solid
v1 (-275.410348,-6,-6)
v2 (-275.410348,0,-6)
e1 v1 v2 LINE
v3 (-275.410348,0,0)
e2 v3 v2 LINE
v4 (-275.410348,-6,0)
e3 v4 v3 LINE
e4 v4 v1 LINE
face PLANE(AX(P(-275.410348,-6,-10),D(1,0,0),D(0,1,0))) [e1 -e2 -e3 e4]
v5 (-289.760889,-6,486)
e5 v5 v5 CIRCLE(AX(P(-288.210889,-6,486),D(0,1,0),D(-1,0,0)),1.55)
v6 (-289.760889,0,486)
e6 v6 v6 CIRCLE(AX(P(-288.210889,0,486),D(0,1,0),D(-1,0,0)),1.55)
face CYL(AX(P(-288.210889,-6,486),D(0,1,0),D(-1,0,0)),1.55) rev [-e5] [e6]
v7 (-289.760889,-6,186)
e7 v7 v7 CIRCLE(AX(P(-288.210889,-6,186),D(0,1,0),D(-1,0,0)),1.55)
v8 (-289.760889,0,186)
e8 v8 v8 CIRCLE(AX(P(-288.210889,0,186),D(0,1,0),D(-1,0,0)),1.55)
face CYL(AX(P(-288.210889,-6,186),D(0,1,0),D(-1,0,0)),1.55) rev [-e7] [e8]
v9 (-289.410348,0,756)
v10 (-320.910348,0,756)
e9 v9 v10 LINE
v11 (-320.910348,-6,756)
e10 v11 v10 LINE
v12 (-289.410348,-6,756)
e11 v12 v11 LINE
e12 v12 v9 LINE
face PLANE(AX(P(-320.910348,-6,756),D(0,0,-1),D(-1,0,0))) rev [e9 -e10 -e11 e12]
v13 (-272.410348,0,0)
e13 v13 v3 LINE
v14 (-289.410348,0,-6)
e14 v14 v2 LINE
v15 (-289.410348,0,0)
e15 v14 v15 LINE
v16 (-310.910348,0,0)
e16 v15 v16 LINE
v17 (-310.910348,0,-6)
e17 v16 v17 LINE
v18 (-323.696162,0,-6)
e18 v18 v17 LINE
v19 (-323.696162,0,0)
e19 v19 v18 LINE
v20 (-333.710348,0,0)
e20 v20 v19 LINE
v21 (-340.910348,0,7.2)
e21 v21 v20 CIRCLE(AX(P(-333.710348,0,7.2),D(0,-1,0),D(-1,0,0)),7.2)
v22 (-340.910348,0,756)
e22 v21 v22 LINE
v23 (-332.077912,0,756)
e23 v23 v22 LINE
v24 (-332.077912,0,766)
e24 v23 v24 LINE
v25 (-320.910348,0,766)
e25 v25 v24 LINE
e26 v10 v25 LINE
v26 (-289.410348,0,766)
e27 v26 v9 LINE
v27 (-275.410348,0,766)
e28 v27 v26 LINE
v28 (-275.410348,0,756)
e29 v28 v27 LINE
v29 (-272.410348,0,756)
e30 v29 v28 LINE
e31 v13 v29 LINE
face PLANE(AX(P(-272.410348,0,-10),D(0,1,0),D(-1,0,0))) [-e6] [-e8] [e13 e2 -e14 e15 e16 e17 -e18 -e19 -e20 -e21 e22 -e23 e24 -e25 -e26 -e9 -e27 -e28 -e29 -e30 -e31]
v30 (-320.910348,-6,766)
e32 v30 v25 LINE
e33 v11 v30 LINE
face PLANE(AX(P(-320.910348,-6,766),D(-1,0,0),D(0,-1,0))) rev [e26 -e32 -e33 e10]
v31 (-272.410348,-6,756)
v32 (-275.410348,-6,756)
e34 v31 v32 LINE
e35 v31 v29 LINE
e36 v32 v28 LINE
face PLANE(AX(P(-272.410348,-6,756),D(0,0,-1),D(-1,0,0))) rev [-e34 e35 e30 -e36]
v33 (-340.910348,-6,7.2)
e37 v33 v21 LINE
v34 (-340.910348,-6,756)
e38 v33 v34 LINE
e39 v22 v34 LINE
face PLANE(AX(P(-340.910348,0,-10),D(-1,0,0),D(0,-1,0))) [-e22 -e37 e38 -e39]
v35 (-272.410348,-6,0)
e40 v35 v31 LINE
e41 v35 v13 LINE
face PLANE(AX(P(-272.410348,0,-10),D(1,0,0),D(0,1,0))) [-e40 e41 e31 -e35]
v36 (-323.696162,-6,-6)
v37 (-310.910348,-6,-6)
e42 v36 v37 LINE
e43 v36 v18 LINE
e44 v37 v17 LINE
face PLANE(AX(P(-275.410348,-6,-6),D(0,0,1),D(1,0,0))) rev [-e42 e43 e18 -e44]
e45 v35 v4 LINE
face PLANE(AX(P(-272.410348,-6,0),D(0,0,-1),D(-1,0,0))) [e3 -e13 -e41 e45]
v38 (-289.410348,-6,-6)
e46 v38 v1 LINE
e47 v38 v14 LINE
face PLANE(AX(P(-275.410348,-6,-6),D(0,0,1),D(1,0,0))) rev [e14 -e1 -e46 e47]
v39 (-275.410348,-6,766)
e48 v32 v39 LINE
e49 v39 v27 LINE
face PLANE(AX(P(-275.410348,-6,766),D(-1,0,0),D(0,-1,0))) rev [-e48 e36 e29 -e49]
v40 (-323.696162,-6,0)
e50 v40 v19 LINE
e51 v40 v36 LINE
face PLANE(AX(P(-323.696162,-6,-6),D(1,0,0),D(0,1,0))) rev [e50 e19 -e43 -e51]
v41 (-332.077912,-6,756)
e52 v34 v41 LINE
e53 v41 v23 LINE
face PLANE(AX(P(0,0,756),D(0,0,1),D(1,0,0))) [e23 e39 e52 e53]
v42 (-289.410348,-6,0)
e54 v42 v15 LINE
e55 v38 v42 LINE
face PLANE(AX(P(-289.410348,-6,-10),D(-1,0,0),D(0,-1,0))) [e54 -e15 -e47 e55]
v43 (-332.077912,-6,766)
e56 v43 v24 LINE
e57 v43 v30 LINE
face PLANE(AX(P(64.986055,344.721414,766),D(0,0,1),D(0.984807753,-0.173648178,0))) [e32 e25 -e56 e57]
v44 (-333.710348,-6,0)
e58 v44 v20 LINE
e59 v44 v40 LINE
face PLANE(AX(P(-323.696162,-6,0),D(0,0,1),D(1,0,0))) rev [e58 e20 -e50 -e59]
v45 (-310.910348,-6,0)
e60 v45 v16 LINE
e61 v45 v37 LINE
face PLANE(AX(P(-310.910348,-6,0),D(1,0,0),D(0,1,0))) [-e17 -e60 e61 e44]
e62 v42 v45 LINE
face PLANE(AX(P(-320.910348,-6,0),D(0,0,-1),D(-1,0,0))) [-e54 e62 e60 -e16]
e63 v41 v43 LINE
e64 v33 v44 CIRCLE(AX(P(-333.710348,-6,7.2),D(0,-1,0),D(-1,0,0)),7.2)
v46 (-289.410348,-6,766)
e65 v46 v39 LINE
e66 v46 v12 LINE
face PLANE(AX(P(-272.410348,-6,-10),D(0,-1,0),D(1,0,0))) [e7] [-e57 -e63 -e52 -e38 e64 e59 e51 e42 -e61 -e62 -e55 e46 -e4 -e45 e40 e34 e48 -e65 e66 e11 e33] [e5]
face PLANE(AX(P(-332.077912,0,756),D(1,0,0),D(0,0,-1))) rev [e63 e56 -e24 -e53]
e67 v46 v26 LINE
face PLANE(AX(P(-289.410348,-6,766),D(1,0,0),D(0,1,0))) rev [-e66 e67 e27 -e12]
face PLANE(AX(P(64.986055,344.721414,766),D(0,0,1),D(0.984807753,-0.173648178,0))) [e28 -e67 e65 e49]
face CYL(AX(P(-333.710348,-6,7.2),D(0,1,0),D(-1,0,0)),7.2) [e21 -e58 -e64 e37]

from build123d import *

# Parameters (mm, degrees)
DODANIE_WYCI_GNI_CIE1_DEPTH      = 766
DODANIE_WYCI_GNI_CIE1_DEPTH_BACK = 10
OBIEKT_PRZENIE_KOPIUJ1_ANGLE     = 10
SZKIC2_W                         = 31.5
SZKIC2_H                         = 10
SZKIC2_W_2                       = 8
SZKIC2_H_2                       = 4
SZKIC2_W_3                       = 3
WYTNIJ_WYCI_GNI_CIE1_DEPTH       = 6
SZKIC3_R                         = 1.55
WYTNIJ_WYCI_GNI_CIE2_DEPTH       = 6
SZYK_LINIOWY1_COUNT              = 2
SZYK_LINIOWY1_PITCH              = 300
WYTNIJ_WYCI_GNI_CIE3_DEPTH       = 6
SZKIC5_W                         = 12
SZKIC5_H                         = 6
DODANIE_WYCI_GNI_CIE2_DEPTH      = 6
SZKIC14_W                        = 8.832436052
SZKIC14_H                        = 6
WYTNIJ_WYCI_GNI_CIE6_DEPTH       = 10


with BuildPart() as part:
    # Szkic1 → Dodanie-wyciągnięcie1 (new, two sides: drawn at the far end of the back side and taken through both)
    with BuildSketch(Plane.XY.offset(-DODANIE_WYCI_GNI_CIE1_DEPTH_BACK)):
        Polygon((-272.410348111, -398.072591802), (-271.368459045, -403.98143832), (-338.827790127, -415.87633849), (-339.869679193, -409.967491972), align=None)
    extrude(amount=DODANIE_WYCI_GNI_CIE1_DEPTH + DODANIE_WYCI_GNI_CIE1_DEPTH_BACK)


with BuildPart() as part_1:
    # Obiekt-Przenieś/Kopiuj1: read off the stored shape, not the designer's step
    # Obiekt-Przenieś/Kopiuj1: moved
    add(part.part.moved(Location((4.1385253, 350.7690313, 0))).rotate(Axis((0, 0, 0), (0, 0, -1)), OBIEKT_PRZENIE_KOPIUJ1_ANGLE))

    # Szkic2 → Wytnij-wyciągnięcie1 (cut)
    with BuildSketch(Plane(origin=(0, 0, 0), x_dir=(1, 0, 0), z_dir=(0, 1, 0))):
        with Locations((-305.160348111, -761)):
            Rectangle(SZKIC2_W, SZKIC2_H)
        with Locations((-336.910348111, -768)):
            Rectangle(SZKIC2_W_2, SZKIC2_H_2)
        with Locations((-273.910348111, -761)):
            Rectangle(SZKIC2_W_3, SZKIC2_H)
    wytnij_wyci_gni_cie1 = extrude(amount=-WYTNIJ_WYCI_GNI_CIE1_DEPTH, mode=Mode.SUBTRACT)

    # Szkic3 → Wytnij-wyciągnięcie2 (cut)
    with BuildSketch(Plane(origin=(0, 0, 0), x_dir=(1, 0, 0), z_dir=(0, 1, 0))):
        with Locations(Location((-288.210889387, -486, 0), (0, 0, 180))):
            Circle(SZKIC3_R)
    wytnij_wyci_gni_cie2 = extrude(amount=-WYTNIJ_WYCI_GNI_CIE2_DEPTH, mode=Mode.SUBTRACT)

    # Szyk liniowy1: Wytnij-wyciągnięcie2 ×2
    with Locations(*[(0, 0, -i * SZYK_LINIOWY1_PITCH) for i in range(1, SZYK_LINIOWY1_COUNT)]):
        add(wytnij_wyci_gni_cie2, mode=Mode.SUBTRACT)

    # Lustro1: Wytnij-wyciągnięcie1 across plane
    add(wytnij_wyci_gni_cie1.mirror(Plane(origin=(-569.794054039, 7.161771209, 378), x_dir=(1, 0, 0), z_dir=(0, 0, 1))), mode=Mode.SUBTRACT)

    # Szkic4 → Wytnij-wyciągnięcie3 (cut)
    with BuildSketch(Plane(origin=(0, 0, 0), x_dir=(1, 0, 0), z_dir=(0, 1, 0))):
        with BuildLine():
            Line((-275.410348111, 10), (-340.910348111, 10))
            Line((-340.910348111, 10), (-340.910348111, -7.2))
            ThreePointArc((-340.910348111, -7.2), (-338.801516936, -2.108831175), (-333.710348111, 0))
            Line((-333.710348111, 0), (-323.696161673, 0))
            Line((-323.696161673, 0), (-323.696161673, 6))
            Line((-323.696161673, 6), (-275.410348111, 6))
            Line((-275.410348111, 6), (-275.410348111, 10))
        make_face()
    extrude(amount=-WYTNIJ_WYCI_GNI_CIE3_DEPTH, mode=Mode.SUBTRACT)

    # Szkic5 → Dodanie-wyciągnięcie2 (add)
    with BuildSketch(Plane(origin=(0, 0, 0), x_dir=(1, 0, 0), z_dir=(0, 1, 0))):
        with Locations((-316.910348111, 3)):
            Rectangle(SZKIC5_W, SZKIC5_H)
    extrude(amount=-DODANIE_WYCI_GNI_CIE2_DEPTH)

    # Szkic14 → Wytnij-wyciągnięcie6 (cut)
    with BuildSketch(Plane.XY.offset(766)):
        with Locations((-336.494130085, -3)):
            Rectangle(SZKIC14_W, SZKIC14_H)
    extrude(amount=-WYTNIJ_WYCI_GNI_CIE6_DEPTH, mode=Mode.SUBTRACT)


solid = part_1.part
